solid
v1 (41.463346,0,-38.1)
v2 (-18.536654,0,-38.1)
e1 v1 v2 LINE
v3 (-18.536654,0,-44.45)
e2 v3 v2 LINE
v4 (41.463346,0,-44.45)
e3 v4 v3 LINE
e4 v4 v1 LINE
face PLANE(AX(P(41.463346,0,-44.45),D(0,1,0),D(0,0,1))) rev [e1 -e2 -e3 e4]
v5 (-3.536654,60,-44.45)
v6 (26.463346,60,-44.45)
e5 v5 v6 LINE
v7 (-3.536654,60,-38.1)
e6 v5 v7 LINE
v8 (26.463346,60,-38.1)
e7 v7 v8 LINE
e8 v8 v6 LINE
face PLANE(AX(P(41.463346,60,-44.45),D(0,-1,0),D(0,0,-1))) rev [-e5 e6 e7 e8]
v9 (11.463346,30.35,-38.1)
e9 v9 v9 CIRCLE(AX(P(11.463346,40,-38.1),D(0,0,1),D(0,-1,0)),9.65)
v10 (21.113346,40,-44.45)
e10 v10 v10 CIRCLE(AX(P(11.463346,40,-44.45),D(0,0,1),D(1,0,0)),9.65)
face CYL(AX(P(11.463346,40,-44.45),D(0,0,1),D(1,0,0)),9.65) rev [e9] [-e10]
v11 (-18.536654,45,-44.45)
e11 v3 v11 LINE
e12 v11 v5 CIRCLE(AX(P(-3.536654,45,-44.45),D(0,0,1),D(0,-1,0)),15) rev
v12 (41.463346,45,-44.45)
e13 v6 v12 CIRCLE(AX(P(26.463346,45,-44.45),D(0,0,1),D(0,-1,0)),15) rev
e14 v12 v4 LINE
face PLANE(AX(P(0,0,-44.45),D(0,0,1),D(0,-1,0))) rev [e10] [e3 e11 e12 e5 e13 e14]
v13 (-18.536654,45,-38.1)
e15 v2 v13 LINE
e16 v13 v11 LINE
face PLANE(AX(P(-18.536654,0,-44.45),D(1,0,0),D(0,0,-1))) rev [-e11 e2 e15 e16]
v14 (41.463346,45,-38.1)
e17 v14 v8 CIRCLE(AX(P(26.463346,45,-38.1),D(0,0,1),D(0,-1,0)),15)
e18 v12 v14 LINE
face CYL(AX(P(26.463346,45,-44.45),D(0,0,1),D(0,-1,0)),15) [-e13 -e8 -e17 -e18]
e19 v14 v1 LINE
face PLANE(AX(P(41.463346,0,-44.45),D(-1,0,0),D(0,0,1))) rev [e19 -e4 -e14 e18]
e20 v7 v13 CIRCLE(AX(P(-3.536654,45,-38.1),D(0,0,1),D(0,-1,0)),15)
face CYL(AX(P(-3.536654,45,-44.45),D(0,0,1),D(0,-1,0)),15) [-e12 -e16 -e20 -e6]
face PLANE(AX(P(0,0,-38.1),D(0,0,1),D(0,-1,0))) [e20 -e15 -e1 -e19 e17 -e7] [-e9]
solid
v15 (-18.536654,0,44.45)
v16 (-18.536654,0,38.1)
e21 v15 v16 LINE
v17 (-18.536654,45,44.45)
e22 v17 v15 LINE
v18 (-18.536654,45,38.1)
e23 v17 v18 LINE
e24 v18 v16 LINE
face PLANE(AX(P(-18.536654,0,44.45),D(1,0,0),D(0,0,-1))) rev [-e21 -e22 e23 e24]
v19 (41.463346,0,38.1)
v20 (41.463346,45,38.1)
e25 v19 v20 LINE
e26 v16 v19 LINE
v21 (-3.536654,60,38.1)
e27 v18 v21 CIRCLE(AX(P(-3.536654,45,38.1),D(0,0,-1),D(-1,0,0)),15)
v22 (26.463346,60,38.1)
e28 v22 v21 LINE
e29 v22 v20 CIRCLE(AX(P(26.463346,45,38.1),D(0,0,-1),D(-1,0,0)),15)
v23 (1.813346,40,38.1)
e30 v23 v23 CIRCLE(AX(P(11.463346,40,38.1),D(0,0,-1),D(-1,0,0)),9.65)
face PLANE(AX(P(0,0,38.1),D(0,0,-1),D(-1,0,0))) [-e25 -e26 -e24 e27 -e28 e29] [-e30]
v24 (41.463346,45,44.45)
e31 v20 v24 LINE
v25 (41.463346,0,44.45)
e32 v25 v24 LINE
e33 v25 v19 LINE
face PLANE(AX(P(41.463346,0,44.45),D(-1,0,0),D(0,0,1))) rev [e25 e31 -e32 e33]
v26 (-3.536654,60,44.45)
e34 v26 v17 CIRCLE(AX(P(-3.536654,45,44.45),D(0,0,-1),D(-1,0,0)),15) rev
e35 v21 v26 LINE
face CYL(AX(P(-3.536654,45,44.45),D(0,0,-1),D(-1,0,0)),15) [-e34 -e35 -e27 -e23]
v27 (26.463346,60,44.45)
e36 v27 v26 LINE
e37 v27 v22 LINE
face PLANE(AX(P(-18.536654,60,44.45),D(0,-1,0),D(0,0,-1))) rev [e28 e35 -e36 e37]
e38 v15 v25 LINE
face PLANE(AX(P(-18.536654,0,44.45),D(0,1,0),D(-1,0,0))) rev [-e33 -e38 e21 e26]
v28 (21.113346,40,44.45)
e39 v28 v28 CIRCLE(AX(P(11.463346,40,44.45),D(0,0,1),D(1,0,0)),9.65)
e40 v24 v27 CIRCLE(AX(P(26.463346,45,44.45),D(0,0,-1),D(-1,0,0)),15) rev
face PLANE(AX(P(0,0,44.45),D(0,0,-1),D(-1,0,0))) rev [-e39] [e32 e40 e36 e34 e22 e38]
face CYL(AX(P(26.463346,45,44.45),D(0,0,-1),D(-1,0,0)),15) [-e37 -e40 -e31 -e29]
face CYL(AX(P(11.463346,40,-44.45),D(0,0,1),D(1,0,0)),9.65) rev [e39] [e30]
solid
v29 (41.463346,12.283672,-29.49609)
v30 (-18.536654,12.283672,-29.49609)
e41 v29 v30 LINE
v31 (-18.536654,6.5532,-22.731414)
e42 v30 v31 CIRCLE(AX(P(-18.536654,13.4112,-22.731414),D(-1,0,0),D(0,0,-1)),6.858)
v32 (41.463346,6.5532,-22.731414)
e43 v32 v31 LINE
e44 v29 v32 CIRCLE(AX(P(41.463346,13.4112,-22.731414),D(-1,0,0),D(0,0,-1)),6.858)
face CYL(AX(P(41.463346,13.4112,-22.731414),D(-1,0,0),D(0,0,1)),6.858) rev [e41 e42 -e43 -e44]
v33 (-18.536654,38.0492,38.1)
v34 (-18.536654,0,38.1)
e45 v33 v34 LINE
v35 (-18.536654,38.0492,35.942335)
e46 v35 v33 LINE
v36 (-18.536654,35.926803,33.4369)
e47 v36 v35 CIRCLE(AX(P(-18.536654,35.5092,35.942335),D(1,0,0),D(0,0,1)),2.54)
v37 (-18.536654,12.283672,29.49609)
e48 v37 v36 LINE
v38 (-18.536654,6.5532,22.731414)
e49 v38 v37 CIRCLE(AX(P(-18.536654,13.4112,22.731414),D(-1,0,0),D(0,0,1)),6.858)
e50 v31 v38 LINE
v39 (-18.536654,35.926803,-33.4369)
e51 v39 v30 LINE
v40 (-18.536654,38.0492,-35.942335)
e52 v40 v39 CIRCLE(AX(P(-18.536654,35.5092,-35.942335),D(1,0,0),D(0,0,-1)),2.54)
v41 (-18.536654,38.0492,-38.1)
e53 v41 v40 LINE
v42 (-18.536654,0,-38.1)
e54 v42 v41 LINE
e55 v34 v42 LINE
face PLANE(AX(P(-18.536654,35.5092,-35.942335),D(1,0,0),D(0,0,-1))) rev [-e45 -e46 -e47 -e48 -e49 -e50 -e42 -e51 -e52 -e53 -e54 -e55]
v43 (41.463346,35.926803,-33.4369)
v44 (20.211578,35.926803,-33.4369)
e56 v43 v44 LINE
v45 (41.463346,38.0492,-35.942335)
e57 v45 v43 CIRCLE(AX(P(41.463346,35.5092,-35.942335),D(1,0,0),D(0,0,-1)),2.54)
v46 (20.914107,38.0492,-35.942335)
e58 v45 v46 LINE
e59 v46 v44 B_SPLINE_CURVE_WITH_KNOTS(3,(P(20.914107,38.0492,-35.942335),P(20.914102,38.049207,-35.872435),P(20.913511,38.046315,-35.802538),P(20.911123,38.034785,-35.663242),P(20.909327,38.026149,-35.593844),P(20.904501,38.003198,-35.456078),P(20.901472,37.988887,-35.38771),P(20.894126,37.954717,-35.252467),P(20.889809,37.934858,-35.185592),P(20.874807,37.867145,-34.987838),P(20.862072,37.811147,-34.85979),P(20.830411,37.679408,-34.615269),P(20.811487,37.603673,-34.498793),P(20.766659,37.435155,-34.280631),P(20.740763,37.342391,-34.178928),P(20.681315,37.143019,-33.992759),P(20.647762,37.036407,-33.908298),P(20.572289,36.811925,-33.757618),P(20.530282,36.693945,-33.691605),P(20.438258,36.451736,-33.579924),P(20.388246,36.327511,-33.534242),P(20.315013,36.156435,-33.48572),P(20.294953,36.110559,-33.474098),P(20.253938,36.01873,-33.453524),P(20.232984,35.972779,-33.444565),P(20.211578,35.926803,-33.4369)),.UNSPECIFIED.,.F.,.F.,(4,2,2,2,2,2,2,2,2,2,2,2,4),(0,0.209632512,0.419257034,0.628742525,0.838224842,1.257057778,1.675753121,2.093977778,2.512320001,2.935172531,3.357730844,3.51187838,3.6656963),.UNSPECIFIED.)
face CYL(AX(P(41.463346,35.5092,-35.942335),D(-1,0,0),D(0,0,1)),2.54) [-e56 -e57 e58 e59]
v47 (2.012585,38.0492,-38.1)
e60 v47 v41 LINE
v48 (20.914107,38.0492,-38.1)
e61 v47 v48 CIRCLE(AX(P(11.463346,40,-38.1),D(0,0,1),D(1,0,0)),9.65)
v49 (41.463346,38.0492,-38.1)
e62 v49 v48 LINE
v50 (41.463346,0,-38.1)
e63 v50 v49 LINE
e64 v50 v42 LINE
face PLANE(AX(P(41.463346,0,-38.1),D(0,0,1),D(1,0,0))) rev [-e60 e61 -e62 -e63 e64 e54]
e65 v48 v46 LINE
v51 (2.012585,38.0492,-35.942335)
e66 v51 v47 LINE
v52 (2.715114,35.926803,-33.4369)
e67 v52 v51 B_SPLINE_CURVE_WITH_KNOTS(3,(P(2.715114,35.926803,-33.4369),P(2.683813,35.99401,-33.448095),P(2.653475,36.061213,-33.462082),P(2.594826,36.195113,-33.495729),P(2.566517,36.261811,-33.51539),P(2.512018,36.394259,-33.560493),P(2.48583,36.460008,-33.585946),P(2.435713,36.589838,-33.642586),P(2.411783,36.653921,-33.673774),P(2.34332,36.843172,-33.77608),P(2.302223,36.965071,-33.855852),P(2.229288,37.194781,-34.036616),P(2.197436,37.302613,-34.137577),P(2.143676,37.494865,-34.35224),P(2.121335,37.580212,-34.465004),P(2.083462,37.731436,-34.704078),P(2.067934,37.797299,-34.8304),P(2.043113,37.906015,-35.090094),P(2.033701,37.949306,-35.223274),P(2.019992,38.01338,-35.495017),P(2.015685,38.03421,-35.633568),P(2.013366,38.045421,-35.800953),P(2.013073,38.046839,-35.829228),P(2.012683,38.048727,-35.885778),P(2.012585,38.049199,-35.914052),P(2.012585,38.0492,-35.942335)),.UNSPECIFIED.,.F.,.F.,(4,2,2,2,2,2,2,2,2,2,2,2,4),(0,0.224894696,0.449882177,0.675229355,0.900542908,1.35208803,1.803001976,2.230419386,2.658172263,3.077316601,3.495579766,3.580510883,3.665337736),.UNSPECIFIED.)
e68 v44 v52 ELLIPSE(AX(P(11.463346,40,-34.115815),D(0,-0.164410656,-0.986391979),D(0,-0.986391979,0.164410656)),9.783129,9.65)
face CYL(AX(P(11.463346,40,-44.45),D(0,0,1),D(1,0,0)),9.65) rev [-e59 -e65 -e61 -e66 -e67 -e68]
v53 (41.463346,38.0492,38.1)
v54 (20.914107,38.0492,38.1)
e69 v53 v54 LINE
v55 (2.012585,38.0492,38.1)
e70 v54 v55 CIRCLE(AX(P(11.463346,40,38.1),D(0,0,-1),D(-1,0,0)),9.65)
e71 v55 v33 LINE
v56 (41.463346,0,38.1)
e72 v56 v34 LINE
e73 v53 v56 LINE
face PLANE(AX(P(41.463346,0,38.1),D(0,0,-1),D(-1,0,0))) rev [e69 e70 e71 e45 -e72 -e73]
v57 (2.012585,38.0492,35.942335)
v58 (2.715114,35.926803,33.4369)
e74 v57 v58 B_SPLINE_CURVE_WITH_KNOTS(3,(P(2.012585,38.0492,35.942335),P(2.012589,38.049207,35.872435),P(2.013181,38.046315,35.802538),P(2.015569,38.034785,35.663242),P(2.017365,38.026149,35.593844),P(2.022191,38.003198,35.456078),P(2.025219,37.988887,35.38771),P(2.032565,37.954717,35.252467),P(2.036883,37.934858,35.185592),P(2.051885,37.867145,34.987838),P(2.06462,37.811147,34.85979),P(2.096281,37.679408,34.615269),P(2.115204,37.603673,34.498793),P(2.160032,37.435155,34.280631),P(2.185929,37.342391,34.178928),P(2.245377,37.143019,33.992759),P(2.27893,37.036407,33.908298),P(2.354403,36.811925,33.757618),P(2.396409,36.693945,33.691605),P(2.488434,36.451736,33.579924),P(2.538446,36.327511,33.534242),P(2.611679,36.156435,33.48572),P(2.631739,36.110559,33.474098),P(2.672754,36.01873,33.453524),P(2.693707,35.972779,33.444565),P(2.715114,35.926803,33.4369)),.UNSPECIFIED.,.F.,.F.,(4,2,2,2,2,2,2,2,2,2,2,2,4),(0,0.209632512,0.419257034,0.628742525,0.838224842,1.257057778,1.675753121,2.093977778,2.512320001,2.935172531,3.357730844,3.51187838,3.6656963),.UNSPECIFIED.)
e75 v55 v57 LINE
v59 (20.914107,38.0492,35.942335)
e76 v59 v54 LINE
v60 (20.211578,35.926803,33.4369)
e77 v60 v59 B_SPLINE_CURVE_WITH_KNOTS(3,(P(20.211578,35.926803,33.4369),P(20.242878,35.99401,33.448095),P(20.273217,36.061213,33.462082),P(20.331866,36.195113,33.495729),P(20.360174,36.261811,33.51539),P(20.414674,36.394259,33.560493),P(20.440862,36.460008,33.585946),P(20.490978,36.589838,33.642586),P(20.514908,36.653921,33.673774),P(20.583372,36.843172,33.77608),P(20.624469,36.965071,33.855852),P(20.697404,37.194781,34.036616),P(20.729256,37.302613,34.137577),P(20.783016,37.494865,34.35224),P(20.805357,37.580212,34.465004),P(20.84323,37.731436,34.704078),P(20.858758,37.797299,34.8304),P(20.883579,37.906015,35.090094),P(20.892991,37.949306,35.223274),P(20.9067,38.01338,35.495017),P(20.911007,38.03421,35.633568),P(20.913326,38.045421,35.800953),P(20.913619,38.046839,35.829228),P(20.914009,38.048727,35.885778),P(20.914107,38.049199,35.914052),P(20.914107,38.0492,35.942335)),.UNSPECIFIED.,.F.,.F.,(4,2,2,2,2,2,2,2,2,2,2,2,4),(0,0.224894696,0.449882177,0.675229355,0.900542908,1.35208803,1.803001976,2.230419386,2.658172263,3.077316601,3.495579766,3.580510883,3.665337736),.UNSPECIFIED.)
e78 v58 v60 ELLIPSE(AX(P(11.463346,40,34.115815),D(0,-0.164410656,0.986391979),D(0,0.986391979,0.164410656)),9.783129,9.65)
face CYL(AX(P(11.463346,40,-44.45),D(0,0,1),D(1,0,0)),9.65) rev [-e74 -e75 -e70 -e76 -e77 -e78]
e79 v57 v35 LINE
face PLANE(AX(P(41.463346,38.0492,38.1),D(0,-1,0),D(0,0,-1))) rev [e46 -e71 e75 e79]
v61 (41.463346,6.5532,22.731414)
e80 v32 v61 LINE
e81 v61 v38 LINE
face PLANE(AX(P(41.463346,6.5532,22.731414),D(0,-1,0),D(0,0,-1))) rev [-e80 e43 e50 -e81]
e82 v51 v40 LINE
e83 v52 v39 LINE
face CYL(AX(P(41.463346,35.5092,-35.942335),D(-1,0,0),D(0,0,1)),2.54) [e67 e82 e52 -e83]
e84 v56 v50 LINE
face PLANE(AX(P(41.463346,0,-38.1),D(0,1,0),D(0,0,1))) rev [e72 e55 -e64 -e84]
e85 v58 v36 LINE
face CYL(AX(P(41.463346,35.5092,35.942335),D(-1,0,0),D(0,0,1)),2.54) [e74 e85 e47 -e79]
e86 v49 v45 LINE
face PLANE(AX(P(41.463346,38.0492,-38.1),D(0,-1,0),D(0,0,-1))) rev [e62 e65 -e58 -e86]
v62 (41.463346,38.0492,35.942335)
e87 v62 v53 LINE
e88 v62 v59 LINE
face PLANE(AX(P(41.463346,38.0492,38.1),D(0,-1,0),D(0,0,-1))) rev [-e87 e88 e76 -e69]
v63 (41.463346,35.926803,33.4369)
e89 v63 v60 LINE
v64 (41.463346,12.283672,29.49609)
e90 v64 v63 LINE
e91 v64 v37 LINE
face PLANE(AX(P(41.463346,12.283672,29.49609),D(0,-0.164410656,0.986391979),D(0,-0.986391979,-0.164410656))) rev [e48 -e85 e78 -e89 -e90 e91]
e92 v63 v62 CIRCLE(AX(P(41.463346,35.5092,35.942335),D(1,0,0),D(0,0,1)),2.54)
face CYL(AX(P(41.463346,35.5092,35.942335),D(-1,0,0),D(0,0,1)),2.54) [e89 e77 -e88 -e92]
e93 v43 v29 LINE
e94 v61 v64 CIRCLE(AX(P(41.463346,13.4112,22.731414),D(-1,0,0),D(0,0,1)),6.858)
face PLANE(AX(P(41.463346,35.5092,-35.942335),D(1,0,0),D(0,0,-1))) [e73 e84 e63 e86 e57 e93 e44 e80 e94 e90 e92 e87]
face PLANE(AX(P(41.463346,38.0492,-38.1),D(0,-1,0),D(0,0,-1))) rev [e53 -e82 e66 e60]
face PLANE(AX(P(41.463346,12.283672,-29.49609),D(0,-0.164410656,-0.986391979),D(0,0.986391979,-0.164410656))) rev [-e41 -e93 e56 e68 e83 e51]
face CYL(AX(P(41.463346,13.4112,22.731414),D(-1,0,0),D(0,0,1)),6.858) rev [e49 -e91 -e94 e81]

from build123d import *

# Parameters (mm, degrees)
MIEMBRO_ESTRUCTURAL1_DEPTH = 60
CROQUIS20_W                = 60
CROQUIS20_H                = 60
BRIDA_BASE2_DEPTH          = 6.35
CROQUIS19_W                = 60
CROQUIS19_H                = 60
BRIDA_BASE3_DEPTH          = 6.35
CORTAR_EXTRUIR1_DEPTH      = 111.153127737
CORTAR_EXTRUIR1_DEPTH_BACK = 111.153127737
CROQUIS4_R                 = 9.65
REDONDEO1_R                = 15
REDONDEO2_R                = 15


# Sheet-metal steps are written as plain solids
with BuildPart() as part:
    # Sketch1 → Miembro estructural1 (new body)
    with BuildSketch(Plane.YZ.offset(-18.536654135)):
        with BuildLine():
            Line((0, -38.1), (0, 38.1))
            Line((0, 38.1), (38.0492, 38.1))
            Line((38.0492, 38.1), (38.0492, 35.942335136))
            ThreePointArc((38.0492, 35.942335136), (37.447280466, 34.300554363), (35.926803066, 33.436899509))
            Line((35.926803066, 33.436899509), (12.283671721, 29.496090157))
            ThreePointArc((12.283671721, 29.496090157), (8.178382741, 27.164222052), (6.5532, 22.731413966))
            Line((6.5532, 22.731413966), (6.5532, -22.731413966))
            ThreePointArc((6.5532, -22.731413966), (8.178382741, -27.164222052), (12.283671721, -29.496090157))
            Line((12.283671721, -29.496090157), (35.926803066, -33.436899509))
            ThreePointArc((35.926803066, -33.436899509), (37.447280466, -34.300554363), (38.0492, -35.942335136))
            Line((38.0492, -35.942335136), (38.0492, -38.1))
            Line((38.0492, -38.1), (0, -38.1))
        make_face()
    extrude(amount=MIEMBRO_ESTRUCTURAL1_DEPTH)


with BuildPart() as body_2:
    # Croquis20 → Brida base2 (new body)
    with BuildSketch(Plane(origin=(0, 0, -38.1), x_dir=(-1, 0, 0), z_dir=(0, 0, -1))):
        with Locations((-11.463345865, 30)):
            Rectangle(CROQUIS20_W, CROQUIS20_H)
    extrude(amount=BRIDA_BASE2_DEPTH)


with BuildPart() as body_3:
    # Croquis19 → Brida base3 (new body)
    with BuildSketch(Plane.XY.offset(38.1)):
        with Locations((11.463345865, 30)):
            Rectangle(CROQUIS19_W, CROQUIS19_H)
    extrude(amount=BRIDA_BASE3_DEPTH)


with BuildPart() as cortar_extruir1_tool:
    # Croquis4 → Cortar-Extruir1 (new, two sides: drawn at the far end of the back side and taken through both)
    with BuildSketch(Plane.XY.offset(38.1).offset(-CORTAR_EXTRUIR1_DEPTH_BACK)):
        with Locations((11.463345865, 40)):
            Circle(CROQUIS4_R)
    extrude(amount=CORTAR_EXTRUIR1_DEPTH + CORTAR_EXTRUIR1_DEPTH_BACK)


with BuildPart() as part_1:
    add(part.part)

    # Cortar-Extruir1: cut by cortar_extruir1_tool
    add(cortar_extruir1_tool.part, mode=Mode.SUBTRACT)


with BuildPart() as body_2_1:
    add(body_2.part)

    # Cortar-Extruir1: cut by cortar_extruir1_tool
    add(cortar_extruir1_tool.part, mode=Mode.SUBTRACT)

    # Redondeo1
    redondeo1_edges = [body_2_1.edges().sort_by_distance(p)[0] for p in [
        (41.463345865, 60, -41.275),
        (-18.536654135, 60, -41.275),
    ]]
    fillet(redondeo1_edges, radius=REDONDEO1_R)


with BuildPart() as body_3_1:
    add(body_3.part)

    # Cortar-Extruir1: cut by cortar_extruir1_tool
    add(cortar_extruir1_tool.part, mode=Mode.SUBTRACT)

    # Redondeo2
    redondeo2_edges = [body_3_1.edges().sort_by_distance(p)[0] for p in [
        (-18.536654135, 60, 41.275),
        (41.463345865, 60, 41.275),
    ]]
    fillet(redondeo2_edges, radius=REDONDEO2_R)


solid = Compound([part_1.part, body_2_1.part, body_3_1.part])
